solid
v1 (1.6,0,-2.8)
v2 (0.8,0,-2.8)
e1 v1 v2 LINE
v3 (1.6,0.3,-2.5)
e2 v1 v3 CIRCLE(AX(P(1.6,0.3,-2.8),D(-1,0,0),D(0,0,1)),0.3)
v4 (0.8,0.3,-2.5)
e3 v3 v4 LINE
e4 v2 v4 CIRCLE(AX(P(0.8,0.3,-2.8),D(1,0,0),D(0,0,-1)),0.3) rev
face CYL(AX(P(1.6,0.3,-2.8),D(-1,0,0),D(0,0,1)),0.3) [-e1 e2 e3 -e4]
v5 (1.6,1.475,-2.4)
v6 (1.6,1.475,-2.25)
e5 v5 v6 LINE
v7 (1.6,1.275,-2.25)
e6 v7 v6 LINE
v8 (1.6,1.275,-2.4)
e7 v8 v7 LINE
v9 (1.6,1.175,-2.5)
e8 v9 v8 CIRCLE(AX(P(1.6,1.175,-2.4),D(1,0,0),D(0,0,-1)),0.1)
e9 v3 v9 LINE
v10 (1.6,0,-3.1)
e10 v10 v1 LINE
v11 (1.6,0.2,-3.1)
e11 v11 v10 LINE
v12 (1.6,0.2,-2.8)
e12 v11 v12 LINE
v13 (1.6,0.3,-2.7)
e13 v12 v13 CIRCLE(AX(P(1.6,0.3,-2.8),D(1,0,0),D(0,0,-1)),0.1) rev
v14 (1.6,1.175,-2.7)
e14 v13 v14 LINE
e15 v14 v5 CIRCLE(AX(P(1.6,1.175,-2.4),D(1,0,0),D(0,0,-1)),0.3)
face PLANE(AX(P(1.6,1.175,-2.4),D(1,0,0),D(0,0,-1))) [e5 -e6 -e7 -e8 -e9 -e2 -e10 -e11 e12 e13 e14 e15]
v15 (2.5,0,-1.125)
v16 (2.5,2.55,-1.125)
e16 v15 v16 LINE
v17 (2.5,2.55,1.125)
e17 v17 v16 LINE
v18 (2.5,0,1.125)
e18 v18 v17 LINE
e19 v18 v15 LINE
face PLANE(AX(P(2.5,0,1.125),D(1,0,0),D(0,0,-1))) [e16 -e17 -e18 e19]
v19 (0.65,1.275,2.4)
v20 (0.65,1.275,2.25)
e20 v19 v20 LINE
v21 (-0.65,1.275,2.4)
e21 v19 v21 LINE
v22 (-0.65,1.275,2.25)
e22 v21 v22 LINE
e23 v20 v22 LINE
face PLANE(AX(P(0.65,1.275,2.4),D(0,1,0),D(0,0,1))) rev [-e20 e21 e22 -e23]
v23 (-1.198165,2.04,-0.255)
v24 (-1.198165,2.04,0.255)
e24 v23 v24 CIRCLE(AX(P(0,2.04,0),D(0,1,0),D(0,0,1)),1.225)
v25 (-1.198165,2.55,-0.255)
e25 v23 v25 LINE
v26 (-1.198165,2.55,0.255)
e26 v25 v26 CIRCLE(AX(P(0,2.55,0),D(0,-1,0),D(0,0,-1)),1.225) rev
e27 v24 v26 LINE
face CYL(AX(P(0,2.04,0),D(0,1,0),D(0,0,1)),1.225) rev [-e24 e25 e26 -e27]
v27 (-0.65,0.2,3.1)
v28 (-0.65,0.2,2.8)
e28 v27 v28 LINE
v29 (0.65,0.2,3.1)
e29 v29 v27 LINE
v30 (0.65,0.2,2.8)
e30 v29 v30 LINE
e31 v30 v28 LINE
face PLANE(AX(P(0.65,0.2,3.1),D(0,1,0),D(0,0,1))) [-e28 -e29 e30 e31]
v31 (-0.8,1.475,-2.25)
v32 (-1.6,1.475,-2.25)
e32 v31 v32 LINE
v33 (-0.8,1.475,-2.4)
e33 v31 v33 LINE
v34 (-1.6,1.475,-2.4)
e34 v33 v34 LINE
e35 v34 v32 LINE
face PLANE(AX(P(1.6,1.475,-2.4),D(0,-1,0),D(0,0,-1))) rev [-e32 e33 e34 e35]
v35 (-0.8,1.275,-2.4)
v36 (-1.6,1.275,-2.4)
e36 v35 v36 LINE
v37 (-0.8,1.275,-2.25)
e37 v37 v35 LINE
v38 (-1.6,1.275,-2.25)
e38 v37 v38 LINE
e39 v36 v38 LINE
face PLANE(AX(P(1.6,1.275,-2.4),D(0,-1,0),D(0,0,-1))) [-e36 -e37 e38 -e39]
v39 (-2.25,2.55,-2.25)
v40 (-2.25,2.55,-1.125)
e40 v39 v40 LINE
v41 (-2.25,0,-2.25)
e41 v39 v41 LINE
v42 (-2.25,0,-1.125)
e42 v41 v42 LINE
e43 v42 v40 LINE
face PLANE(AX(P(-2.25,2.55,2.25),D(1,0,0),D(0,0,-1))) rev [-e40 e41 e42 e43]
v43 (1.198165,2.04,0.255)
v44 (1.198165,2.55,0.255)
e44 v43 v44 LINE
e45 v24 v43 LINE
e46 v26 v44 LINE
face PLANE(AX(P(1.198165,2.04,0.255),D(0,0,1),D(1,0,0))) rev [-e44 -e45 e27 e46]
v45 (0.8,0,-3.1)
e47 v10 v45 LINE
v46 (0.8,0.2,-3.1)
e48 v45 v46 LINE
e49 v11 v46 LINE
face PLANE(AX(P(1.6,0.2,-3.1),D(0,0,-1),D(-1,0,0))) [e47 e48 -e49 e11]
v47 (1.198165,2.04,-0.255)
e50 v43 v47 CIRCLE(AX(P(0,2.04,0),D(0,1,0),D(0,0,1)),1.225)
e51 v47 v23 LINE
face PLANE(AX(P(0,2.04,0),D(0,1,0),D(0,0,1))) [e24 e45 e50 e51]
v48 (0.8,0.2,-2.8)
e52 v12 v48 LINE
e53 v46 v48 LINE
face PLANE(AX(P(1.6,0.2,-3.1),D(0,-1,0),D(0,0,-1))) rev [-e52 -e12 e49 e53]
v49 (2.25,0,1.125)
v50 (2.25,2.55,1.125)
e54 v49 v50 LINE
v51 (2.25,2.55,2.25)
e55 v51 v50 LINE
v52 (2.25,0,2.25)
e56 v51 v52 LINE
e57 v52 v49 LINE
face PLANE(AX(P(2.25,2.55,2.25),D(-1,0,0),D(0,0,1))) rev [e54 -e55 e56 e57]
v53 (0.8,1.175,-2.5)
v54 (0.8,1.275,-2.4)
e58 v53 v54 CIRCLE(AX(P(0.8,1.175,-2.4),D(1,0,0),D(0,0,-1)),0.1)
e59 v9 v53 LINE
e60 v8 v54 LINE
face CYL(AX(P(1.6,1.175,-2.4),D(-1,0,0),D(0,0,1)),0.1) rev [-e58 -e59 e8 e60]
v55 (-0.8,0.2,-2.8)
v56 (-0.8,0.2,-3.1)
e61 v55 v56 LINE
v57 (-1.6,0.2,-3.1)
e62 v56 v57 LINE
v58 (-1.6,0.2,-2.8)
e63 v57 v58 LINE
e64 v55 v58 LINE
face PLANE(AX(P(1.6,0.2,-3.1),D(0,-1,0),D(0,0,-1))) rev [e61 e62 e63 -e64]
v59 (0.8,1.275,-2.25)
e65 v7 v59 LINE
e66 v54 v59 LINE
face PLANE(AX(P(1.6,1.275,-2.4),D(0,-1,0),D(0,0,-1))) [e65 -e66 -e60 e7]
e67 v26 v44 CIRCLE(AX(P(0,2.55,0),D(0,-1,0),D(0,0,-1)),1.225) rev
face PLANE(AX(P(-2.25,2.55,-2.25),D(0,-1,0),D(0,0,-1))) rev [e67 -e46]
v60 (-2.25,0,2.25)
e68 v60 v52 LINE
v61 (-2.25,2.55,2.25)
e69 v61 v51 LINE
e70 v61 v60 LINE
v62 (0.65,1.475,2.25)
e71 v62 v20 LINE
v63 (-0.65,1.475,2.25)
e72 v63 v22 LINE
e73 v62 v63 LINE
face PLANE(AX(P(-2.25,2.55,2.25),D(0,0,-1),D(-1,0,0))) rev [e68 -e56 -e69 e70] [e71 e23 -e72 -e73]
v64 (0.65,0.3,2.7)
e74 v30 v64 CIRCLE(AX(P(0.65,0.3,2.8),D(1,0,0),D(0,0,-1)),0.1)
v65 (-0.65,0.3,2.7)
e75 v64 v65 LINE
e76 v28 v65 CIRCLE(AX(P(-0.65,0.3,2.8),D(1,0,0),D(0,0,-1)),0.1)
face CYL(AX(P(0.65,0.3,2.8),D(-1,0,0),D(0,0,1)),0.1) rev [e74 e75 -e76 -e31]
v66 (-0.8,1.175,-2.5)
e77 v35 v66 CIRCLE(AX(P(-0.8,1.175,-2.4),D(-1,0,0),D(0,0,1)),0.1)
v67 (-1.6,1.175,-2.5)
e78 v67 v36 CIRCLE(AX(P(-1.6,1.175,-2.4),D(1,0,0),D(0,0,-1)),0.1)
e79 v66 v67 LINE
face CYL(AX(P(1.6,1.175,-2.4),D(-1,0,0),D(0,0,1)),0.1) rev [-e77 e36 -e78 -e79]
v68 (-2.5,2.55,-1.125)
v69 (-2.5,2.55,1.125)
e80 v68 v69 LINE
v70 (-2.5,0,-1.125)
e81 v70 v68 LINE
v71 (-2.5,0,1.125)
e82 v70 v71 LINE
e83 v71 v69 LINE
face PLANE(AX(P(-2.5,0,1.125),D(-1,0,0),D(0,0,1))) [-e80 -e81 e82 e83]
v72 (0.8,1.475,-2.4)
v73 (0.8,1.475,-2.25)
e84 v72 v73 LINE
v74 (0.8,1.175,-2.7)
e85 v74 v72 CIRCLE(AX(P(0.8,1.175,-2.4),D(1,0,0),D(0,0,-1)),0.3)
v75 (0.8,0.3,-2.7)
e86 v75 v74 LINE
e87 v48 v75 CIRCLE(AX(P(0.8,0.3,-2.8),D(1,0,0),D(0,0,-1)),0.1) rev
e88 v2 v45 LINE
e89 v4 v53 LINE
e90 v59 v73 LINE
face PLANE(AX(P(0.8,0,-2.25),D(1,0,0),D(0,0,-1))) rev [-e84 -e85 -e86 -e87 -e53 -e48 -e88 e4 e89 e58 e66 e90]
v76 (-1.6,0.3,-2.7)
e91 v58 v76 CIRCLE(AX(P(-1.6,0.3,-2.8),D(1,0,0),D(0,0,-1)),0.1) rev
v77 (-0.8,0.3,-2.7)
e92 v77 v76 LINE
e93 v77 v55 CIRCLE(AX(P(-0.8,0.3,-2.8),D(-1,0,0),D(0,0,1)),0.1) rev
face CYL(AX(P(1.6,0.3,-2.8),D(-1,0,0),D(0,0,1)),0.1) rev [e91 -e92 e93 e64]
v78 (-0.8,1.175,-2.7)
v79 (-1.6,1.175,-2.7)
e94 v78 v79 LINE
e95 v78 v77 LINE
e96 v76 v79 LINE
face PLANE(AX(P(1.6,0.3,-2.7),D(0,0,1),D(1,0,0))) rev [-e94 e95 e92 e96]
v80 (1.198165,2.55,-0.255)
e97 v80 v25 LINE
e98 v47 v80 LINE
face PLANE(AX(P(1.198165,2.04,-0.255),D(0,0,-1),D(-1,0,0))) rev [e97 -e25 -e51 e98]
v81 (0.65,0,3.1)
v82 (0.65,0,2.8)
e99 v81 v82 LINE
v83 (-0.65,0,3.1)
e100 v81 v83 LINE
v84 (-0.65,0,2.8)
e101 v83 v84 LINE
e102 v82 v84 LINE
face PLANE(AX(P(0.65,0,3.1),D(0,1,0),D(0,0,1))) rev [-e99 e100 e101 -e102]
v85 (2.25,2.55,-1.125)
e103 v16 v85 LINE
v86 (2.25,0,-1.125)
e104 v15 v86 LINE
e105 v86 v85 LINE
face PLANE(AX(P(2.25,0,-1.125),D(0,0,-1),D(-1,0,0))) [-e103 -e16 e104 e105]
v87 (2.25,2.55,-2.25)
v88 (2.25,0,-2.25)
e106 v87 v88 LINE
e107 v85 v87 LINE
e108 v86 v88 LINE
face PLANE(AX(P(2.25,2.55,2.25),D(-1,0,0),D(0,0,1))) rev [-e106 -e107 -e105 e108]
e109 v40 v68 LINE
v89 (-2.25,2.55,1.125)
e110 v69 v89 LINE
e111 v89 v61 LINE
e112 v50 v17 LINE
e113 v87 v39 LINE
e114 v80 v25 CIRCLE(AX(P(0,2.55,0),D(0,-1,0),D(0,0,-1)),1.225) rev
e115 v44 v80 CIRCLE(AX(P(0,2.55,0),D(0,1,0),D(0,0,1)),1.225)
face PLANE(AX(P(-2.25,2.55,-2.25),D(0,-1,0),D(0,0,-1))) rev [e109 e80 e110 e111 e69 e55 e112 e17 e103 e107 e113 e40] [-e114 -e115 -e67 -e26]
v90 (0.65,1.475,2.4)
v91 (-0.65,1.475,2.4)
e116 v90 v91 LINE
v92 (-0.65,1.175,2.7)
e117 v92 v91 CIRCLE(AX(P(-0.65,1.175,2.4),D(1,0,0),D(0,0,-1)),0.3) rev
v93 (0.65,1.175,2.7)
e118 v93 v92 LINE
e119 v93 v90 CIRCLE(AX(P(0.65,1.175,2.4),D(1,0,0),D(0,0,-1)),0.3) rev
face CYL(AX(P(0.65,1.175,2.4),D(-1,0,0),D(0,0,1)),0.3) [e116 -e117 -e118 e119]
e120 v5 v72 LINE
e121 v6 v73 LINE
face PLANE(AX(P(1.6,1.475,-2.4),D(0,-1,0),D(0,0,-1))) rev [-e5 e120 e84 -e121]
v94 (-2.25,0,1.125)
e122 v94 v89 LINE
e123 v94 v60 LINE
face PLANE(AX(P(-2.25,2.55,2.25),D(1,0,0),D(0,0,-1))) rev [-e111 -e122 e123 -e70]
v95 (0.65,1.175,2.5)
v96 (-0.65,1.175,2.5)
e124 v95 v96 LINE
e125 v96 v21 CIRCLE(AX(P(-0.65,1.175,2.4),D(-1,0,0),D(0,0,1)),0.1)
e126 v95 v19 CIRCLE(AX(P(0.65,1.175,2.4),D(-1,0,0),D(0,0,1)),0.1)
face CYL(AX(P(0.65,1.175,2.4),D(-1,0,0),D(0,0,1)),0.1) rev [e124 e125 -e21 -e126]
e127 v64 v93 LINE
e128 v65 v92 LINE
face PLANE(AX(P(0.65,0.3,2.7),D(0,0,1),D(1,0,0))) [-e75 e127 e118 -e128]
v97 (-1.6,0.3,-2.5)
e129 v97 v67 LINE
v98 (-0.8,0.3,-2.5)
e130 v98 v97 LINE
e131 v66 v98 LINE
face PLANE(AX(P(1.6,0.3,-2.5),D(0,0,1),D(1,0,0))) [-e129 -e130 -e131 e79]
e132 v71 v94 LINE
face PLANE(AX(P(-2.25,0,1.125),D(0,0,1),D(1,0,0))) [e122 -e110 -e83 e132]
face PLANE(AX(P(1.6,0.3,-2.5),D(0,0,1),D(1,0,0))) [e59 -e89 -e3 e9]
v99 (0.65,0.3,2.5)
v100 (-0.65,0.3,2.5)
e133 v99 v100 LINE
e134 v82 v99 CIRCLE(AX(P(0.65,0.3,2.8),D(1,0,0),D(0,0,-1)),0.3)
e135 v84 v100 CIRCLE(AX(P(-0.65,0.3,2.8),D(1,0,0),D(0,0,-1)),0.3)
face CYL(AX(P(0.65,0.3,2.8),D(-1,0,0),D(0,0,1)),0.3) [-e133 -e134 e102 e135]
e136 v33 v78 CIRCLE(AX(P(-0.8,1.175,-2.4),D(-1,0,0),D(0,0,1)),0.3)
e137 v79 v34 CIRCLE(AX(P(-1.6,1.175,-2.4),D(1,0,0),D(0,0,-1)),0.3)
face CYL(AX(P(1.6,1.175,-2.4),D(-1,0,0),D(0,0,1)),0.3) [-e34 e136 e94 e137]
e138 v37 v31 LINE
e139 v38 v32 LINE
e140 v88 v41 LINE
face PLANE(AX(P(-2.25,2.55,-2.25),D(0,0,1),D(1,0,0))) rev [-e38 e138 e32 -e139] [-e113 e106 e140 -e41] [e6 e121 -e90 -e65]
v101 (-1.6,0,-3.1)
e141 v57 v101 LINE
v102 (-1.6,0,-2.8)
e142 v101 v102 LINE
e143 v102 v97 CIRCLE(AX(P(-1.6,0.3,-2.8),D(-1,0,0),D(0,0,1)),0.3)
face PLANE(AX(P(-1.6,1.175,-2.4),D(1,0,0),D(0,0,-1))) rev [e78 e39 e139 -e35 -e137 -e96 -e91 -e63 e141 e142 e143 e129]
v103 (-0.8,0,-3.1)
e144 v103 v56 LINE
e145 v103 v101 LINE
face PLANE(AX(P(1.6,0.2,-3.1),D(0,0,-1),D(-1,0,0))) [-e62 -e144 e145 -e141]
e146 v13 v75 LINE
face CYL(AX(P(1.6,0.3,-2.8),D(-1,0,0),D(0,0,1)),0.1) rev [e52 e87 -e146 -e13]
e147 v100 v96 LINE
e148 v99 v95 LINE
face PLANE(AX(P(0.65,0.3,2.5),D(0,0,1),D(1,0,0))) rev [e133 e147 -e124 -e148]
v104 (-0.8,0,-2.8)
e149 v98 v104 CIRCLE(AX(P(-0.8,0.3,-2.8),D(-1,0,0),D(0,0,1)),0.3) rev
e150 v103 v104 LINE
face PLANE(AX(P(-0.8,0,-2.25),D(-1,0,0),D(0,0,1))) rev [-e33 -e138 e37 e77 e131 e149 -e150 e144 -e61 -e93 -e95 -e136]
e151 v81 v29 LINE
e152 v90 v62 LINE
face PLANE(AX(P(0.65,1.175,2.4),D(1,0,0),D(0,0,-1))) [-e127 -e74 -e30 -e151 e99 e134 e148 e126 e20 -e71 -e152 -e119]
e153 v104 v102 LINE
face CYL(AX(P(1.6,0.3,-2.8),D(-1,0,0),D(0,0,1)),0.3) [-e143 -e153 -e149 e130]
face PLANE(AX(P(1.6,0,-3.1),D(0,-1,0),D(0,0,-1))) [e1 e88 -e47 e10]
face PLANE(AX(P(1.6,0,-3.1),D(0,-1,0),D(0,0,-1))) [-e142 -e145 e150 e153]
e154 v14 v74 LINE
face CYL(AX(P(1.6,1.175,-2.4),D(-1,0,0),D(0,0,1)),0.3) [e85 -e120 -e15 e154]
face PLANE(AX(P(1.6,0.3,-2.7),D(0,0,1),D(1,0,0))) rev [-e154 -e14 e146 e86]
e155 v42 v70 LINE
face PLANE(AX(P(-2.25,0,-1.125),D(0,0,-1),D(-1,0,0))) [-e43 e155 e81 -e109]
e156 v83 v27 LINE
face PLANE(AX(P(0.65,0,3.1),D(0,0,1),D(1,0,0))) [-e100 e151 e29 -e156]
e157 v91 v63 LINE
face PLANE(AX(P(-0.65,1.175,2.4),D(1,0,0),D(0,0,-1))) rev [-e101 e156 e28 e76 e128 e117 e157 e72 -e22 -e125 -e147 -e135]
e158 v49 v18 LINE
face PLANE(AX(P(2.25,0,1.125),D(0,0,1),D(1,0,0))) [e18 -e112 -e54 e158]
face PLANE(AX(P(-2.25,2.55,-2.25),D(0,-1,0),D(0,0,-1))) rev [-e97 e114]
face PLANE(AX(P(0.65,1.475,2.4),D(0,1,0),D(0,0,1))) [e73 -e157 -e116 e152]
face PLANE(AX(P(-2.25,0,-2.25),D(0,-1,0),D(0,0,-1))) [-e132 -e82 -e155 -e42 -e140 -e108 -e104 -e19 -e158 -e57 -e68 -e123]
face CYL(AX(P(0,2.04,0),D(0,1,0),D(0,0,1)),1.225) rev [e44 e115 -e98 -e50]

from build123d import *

# Parameters (mm, degrees)
SKETCH1_W                                      = 4.5
SKETCH1_H                                      = 4.5
BASE_EXTRUDE_DEPTH                             = 2.55
SKETCH2_W                                      = 0.25
SKETCH2_H                                      = 2.25
EARS_EXTRUDE1_DEPTH                            = 2.55
DOUBLE_START                                   = -1.6
DOUBLE_FEET_EXTRUDE_THIN1_DEPTH                = 3.2
SINGLE_START                                   = -0.65
SINGLE_FOOT_EXTRUDE_THIN2_DEPTH                = 1.3
SKETCH5_W                                      = 1.6
SKETCH5_H                                      = 0.85
REMOVE_MIDDLE_OF_THE_DOUBLE_PINS_EXTRUDE_DEPTH = 5.728900506
SCREW_DRIVER_SLOT_EXTRUDE2_DEPTH               = 0.51


# Read off the part's stored shape, not the designer's step: double feet-Extrude-Thin1, single foot-Extrude-Thin2
with BuildPart() as part:
    # Sketch1 → Base-Extrude (new body)
    with BuildSketch(Plane(origin=(0, 0, 0), x_dir=(1, 0, 0), z_dir=(0, 1, 0))):
        Rectangle(SKETCH1_W, SKETCH1_H)
    extrude(amount=BASE_EXTRUDE_DEPTH)

    # Sketch2 → ears-Extrude1 (add, through all)
    with BuildSketch(Plane(origin=(0, 2.55, 0), x_dir=(-1, 0, 0), z_dir=(0, 1, 0))):
        with Locations((-2.375, 0)):
            Rectangle(SKETCH2_W, SKETCH2_H)
        with Locations((2.375, 0)):
            Rectangle(SKETCH2_W, SKETCH2_H)
    extrude(amount=-EARS_EXTRUDE1_DEPTH)

    # double feet-Extrude-Thin1 outline → double feet-Extrude-Thin1 (add)
    with BuildSketch(Plane(origin=(0, 0, 0), x_dir=(0, 0, -1), z_dir=(1, 0, 0)).offset(DOUBLE_START)):
        with BuildLine():
            ThreePointArc((2.5, 0.3), (2.587867966, 0.087867966), (2.8, 0))
            Line((2.8, 0), (3.1, 0))
            Line((3.1, 0), (3.1, 0.2))
            Line((3.1, 0.2), (2.8, 0.2))
            ThreePointArc((2.8, 0.2), (2.729289322, 0.229289322), (2.7, 0.3))
            Line((2.7, 0.3), (2.7, 1.175))
            ThreePointArc((2.7, 1.175), (2.612132034, 1.387132034), (2.4, 1.475))
            Line((2.4, 1.475), (2.25, 1.475))
            Line((2.25, 1.475), (2.25, 1.275))
            Line((2.25, 1.275), (2.4, 1.275))
            ThreePointArc((2.4, 1.275), (2.470710678, 1.245710678), (2.5, 1.175))
            Line((2.5, 1.175), (2.5, 0.3))
        make_face()
    extrude(amount=DOUBLE_FEET_EXTRUDE_THIN1_DEPTH)

    # single foot-Extrude-Thin2 outline → single foot-Extrude-Thin2 (add)
    with BuildSketch(Plane(origin=(0, 0, 0), x_dir=(0, 0, -1), z_dir=(1, 0, 0)).offset(SINGLE_START)):
        with BuildLine():
            Line((-3.1, 0), (-2.8, 0))
            ThreePointArc((-2.8, 0), (-2.587867966, 0.087867966), (-2.5, 0.3))
            Line((-2.5, 0.3), (-2.5, 1.175))
            ThreePointArc((-2.5, 1.175), (-2.470710678, 1.245710678), (-2.4, 1.275))
            Line((-2.4, 1.275), (-2.25, 1.275))
            Line((-2.25, 1.275), (-2.25, 1.475))
            Line((-2.25, 1.475), (-2.4, 1.475))
            ThreePointArc((-2.4, 1.475), (-2.612132034, 1.387132034), (-2.7, 1.175))
            Line((-2.7, 1.175), (-2.7, 0.3))
            ThreePointArc((-2.7, 0.3), (-2.729289322, 0.229289322), (-2.8, 0.2))
            Line((-2.8, 0.2), (-3.1, 0.2))
            Line((-3.1, 0.2), (-3.1, 0))
        make_face()
    extrude(amount=SINGLE_FOOT_EXTRUDE_THIN2_DEPTH)

    # Sketch5 → remove middle of the double pins-Extrude1 (cut, through all)
    with BuildSketch(Plane(origin=(0, 2.55, 0), x_dir=(-1, 0, 0), z_dir=(0, 1, 0))):
        with Locations((0, -2.675)):
            Rectangle(SKETCH5_W, SKETCH5_H)
    extrude(amount=-REMOVE_MIDDLE_OF_THE_DOUBLE_PINS_EXTRUDE_DEPTH, mode=Mode.SUBTRACT)

    # Sketch7 → screw driver slot-Extrude2 (cut)
    with BuildSketch(Plane(origin=(0, 2.55, 0), x_dir=(-1, 0, 0), z_dir=(0, 1, 0))):
        with BuildLine():
            Line((-1.198165264, 0.255), (1.198165264, 0.255))
            ThreePointArc((1.198165264, 0.255), (1.225, 0), (1.198165264, -0.255))
            Line((1.198165264, -0.255), (-1.198165264, -0.255))
            ThreePointArc((-1.198165264, -0.255), (-1.225, 0), (-1.198165264, 0.255))
        make_face()
    extrude(amount=-SCREW_DRIVER_SLOT_EXTRUDE2_DEPTH, mode=Mode.SUBTRACT)


solid = part.part
